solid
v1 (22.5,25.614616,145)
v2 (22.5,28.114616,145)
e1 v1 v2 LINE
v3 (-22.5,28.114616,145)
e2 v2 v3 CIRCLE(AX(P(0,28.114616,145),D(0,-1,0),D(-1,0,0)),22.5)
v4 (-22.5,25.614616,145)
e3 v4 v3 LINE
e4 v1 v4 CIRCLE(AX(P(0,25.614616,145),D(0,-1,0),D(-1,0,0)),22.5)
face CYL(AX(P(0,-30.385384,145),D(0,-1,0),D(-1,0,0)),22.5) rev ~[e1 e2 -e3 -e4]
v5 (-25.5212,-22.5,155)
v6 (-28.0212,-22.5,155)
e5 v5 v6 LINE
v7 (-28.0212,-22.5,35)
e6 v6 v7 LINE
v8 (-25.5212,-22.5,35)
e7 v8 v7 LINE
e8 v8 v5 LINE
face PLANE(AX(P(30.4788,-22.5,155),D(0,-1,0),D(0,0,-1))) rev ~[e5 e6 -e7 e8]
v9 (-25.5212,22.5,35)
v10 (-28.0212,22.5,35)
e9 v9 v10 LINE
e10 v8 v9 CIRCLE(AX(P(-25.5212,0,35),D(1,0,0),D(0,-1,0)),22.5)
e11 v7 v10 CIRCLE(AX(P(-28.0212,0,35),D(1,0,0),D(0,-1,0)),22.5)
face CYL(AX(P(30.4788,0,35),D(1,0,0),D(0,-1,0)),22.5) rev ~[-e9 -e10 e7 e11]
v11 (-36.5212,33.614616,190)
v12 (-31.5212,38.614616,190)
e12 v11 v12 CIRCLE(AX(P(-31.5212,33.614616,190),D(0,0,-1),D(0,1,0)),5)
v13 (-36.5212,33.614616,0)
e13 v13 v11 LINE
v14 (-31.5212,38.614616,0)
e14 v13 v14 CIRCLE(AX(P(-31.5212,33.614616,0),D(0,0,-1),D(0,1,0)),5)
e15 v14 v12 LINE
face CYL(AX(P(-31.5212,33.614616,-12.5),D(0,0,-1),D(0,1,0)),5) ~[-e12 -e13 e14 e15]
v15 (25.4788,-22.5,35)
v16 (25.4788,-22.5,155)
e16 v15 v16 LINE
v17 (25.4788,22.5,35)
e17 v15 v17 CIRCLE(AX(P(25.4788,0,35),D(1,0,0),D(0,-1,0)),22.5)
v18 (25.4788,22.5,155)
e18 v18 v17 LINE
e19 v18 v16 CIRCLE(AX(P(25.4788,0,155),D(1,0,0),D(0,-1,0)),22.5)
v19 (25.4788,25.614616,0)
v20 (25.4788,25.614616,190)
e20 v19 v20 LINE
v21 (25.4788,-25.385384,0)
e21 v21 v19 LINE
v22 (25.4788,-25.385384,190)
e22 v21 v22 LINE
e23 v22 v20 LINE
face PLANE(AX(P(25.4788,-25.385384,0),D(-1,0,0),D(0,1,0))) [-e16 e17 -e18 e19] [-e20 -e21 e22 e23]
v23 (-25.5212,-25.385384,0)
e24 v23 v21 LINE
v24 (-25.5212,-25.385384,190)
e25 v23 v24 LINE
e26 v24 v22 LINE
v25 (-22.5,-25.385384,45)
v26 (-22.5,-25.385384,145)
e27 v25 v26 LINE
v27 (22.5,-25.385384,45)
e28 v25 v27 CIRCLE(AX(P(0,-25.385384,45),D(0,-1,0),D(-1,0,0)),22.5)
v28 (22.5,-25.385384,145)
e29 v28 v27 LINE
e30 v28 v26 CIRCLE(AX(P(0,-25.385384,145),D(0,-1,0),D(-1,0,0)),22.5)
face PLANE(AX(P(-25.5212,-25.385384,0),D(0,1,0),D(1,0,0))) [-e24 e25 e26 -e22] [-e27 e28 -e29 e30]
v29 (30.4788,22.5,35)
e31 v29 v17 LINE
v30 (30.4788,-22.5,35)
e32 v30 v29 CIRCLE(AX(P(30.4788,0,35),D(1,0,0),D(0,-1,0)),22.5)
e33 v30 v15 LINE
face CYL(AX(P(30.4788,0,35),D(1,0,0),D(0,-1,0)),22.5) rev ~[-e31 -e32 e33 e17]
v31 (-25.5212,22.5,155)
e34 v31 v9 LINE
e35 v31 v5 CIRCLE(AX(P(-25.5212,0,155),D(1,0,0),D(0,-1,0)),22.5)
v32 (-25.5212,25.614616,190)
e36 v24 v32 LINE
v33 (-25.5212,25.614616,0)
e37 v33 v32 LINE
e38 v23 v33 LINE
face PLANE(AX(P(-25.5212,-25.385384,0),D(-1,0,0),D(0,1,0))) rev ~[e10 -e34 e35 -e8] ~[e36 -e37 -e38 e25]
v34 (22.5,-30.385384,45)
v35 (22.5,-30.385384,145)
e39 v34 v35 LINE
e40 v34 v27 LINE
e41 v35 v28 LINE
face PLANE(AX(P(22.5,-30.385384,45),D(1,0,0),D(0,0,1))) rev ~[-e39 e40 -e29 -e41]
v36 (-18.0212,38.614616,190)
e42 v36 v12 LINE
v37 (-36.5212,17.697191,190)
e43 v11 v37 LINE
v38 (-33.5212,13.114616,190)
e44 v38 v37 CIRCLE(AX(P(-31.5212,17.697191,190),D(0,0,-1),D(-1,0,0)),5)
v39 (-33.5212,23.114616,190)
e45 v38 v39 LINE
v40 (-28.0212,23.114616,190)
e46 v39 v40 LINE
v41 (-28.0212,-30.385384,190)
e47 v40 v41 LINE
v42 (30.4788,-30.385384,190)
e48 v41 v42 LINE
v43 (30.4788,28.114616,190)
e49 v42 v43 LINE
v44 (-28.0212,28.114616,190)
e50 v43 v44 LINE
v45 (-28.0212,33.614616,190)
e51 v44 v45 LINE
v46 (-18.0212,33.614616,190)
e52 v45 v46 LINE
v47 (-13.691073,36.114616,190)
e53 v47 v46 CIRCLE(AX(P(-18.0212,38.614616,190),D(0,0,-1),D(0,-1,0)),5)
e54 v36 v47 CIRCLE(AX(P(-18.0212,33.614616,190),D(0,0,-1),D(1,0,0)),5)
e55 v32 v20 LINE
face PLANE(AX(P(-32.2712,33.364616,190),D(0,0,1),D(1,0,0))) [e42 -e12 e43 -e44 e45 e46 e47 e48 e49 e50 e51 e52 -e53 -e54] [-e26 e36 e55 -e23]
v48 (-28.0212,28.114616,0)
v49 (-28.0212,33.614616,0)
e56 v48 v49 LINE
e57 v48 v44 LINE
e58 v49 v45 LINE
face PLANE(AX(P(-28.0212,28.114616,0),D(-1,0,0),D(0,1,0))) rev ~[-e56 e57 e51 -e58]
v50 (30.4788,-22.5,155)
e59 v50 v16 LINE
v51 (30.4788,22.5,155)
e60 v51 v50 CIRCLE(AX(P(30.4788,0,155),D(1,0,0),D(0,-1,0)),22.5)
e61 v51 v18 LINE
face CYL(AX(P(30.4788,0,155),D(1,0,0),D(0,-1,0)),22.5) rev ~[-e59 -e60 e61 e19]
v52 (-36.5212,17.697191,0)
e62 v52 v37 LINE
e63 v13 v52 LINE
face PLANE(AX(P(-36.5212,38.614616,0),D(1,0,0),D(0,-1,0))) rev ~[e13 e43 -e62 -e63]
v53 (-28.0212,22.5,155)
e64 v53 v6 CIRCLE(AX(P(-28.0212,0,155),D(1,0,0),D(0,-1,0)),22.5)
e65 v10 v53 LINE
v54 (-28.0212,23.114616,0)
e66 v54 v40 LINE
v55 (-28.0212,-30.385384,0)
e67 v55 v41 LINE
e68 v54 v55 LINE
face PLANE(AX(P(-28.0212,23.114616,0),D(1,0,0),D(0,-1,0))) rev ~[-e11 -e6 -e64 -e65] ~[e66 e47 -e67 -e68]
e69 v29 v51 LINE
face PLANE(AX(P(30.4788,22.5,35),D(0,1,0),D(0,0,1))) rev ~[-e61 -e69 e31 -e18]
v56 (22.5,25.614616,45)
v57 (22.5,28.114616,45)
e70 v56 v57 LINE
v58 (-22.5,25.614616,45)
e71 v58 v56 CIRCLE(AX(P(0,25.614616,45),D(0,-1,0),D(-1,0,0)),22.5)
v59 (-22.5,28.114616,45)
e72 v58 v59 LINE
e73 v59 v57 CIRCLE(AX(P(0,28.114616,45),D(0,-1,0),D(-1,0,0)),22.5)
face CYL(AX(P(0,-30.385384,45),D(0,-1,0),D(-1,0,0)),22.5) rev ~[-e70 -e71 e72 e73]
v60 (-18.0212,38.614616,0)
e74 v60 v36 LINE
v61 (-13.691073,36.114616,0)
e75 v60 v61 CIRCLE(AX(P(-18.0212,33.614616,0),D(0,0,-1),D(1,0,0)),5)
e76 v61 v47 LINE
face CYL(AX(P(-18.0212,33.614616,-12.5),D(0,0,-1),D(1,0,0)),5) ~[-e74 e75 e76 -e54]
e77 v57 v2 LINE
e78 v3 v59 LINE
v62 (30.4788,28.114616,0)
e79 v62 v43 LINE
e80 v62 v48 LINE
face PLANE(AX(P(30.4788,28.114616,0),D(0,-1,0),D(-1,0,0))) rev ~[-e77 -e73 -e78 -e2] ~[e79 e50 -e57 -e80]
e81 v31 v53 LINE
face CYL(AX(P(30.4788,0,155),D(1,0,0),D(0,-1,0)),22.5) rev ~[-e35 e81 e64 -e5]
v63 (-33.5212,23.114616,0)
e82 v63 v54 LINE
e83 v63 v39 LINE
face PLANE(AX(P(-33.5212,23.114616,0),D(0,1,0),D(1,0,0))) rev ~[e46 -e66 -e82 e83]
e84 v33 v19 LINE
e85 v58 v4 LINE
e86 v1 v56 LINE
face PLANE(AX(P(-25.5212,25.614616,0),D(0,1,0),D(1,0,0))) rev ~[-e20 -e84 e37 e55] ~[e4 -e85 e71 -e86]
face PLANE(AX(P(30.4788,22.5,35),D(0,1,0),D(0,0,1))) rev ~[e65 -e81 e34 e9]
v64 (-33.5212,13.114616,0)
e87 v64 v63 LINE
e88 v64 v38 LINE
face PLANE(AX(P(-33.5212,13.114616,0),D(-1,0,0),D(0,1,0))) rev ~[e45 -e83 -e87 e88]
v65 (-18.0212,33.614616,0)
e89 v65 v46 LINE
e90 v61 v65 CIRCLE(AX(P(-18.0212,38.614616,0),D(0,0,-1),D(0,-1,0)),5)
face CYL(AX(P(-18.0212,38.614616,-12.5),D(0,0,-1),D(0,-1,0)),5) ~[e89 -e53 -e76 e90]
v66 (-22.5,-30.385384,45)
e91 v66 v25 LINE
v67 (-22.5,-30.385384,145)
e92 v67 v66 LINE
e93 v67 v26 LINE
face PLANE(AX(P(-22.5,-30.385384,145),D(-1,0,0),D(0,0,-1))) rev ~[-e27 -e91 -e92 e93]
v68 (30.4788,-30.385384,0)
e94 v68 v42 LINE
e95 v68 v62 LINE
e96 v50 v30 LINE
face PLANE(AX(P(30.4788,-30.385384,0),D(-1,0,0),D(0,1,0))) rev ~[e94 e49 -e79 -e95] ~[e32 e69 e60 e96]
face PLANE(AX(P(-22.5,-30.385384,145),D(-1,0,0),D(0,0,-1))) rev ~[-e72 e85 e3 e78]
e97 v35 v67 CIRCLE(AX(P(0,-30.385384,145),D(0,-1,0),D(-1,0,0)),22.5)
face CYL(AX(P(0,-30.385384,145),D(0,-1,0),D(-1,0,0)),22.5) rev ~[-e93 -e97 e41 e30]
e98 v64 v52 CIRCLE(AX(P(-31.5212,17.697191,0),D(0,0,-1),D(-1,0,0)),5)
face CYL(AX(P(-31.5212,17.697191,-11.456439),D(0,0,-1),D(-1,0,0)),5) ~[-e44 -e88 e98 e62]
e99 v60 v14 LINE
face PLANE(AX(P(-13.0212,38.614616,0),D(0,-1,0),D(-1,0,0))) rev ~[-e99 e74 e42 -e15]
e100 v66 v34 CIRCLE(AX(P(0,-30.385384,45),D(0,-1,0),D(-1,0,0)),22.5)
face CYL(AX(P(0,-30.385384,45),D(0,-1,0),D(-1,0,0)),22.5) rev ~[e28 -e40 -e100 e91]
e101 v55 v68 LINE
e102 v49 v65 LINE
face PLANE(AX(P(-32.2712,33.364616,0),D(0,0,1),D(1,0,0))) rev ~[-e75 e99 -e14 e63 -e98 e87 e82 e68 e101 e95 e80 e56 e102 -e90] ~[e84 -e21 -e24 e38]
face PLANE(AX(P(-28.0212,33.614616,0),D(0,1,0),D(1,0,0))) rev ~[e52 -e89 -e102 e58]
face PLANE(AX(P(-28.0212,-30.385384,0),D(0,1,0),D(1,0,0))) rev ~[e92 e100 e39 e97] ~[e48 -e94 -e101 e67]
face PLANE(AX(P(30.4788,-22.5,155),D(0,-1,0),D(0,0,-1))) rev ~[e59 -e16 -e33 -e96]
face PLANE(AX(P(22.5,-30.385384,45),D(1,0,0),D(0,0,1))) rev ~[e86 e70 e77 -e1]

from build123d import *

# Parameters (mm, degrees)
F0_W        = 5.5
F0_H        = 5
F0_W_2      = 51
F0_H_2      = 51
F1_DEPTH    = 190
F2_T1_DEPTH = 215
F2_T3_DEPTH = 212.9128784748
F4_DEPTH    = 60
F6_DEPTH    = 60


# Not quite as in the source:
# - a fillet or chamfer that OpenCascade refuses, or shapes differently, is made with other operations: its cross-section is extruded or revolved along the edge and cut away or added


with BuildPart() as f1:
    # F0 (on Top) → F1 (new body)
    with BuildSketch(Plane.XY):
        Polygon((-33.5212003861, 28.1146157656), (-28.0212003861, 28.1146157656), (-28.0212003861, 33.6146157656), (-28.0212003861, 38.6146157656), (-36.5212003861, 38.6146157656), (-36.5212003861, 28.1146157656), align=None)
        Polygon((-28.0212003861, 38.6146157656), (-28.0212003861, 33.6146157656), (-23.0212003861, 33.6146157656), (-13.0212003861, 33.6146157656), (-13.0212003861, 38.6146157656), align=None)
        with Locations((-30.7712003861, 25.6146157656)):
            Rectangle(F0_W, F0_H)
        Polygon((-33.5212003861, 23.1146157656), (-33.5212003861, 28.1146157656), (-36.5212003861, 28.1146157656), (-36.5212003861, 13.1146157656), (-33.5212003861, 13.1146157656), align=None)
        Polygon((-23.0212003861, 28.1146157656), (-28.0212003861, 28.1146157656), (-28.0212003861, 23.1146157656), (-28.0212003861, -30.3853842344), (30.4787996139, -30.3853842344), (30.4787996139, 28.1146157656), align=None)
        with Locations((-0.0212003861, 0.1146157656)):
            Rectangle(F0_W_2, F0_H_2, mode=Mode.SUBTRACT)
    extrude(amount=F1_DEPTH)

    # F2: fillet of radius 5 on 4 edges, made by hand

    # F2_s2 → F2_t1 (cut)
    with BuildSketch(Plane.XY.offset(-12.5)):
        with BuildLine():
            ThreePointArc((-31.5212003861, 38.6146157656), (-35.056734292, 37.1501496716), (-36.5212003861, 33.6146157656))
            Line((-36.5212003861, 33.6146157656), (-36.5212003861, 38.6146157656))
            Line((-36.5212003861, 38.6146157656), (-31.5212003861, 38.6146157656))
        make_face()
        with BuildLine():
            ThreePointArc((-13.0212003861, 33.6146157656), (-14.4856664802, 37.1501496716), (-18.0212003861, 38.6146157656))
            Line((-18.0212003861, 38.6146157656), (-13.0212003861, 38.6146157656))
            Line((-13.0212003861, 38.6146157656), (-13.0212003861, 33.6146157656))
        make_face()
        with BuildLine():
            ThreePointArc((-18.0212003861, 33.6146157656), (-14.4856664802, 35.0790818597), (-13.0212003861, 38.6146157656))
            Line((-13.0212003861, 38.6146157656), (-13.0212003861, 33.6146157656))
            Line((-13.0212003861, 33.6146157656), (-18.0212003861, 33.6146157656))
        make_face()
    extrude(amount=F2_T1_DEPTH, mode=Mode.SUBTRACT)

    # F2_s4 → F2_t3 (cut)
    with BuildSketch(Plane.XY.offset(-11.4564392374)):
        with BuildLine():
            ThreePointArc((-36.5212003861, 17.6971914606), (-35.7045005188, 14.9585786731), (-33.5212003861, 13.1146157656))
            Line((-33.5212003861, 13.1146157656), (-36.5212003861, 13.1146157656))
            Line((-36.5212003861, 13.1146157656), (-36.5212003861, 17.6971914606))
        make_face()
    extrude(amount=F2_T3_DEPTH, mode=Mode.SUBTRACT)

    # F3 (on face) → F4 (cut)
    with BuildSketch(Plane.YZ.offset(30.4787996139)):
        with BuildLine():
            Line((-22.5, 155), (22.5, 155))
            ThreePointArc((22.5, 155), (0, 177.5), (-22.5, 155))
        make_face()
        with BuildLine():
            ThreePointArc((-22.5, 155), (0, 132.5), (22.5, 155))
            Line((22.5, 155), (-22.5, 155))
        make_face()
        with BuildLine():
            ThreePointArc((-22.5, 35), (0, 57.5), (22.5, 35))
            Line((22.5, 35), (22.5, 155))
            ThreePointArc((22.5, 155), (0, 132.5), (-22.5, 155))
            Line((-22.5, 155), (-22.5, 35))
        make_face()
        with BuildLine():
            Line((-22.5, 35), (22.5, 35))
            ThreePointArc((22.5, 35), (0, 57.5), (-22.5, 35))
        make_face()
        with BuildLine():
            ThreePointArc((-22.5, 35), (0, 12.5), (22.5, 35))
            Line((22.5, 35), (-22.5, 35))
        make_face()
    extrude(amount=-F4_DEPTH, mode=Mode.SUBTRACT)

    # F5 (on face) → F6 (cut)
    with BuildSketch(Plane.XZ.offset(30.3853842344)):
        with BuildLine():
            Line((-22.5, 145), (22.5, 145))
            ThreePointArc((22.5, 145), (0, 167.5), (-22.5, 145))
        make_face()
        with BuildLine():
            ThreePointArc((-22.5, 145), (0, 122.5), (22.5, 145))
            Line((22.5, 145), (-22.5, 145))
        make_face()
        with BuildLine():
            Line((22.5, 45), (22.5, 145))
            ThreePointArc((22.5, 145), (0, 122.5), (-22.5, 145))
            Line((-22.5, 145), (-22.5, 45))
            ThreePointArc((-22.5, 45), (0, 67.5), (22.5, 45))
        make_face()
        with BuildLine():
            Line((-22.5, 45), (22.5, 45))
            ThreePointArc((22.5, 45), (0, 67.5), (-22.5, 45))
        make_face()
        with BuildLine():
            ThreePointArc((-22.5, 45), (0, 22.5), (22.5, 45))
            Line((22.5, 45), (-22.5, 45))
        make_face()
    extrude(amount=-F6_DEPTH, mode=Mode.SUBTRACT)


solid = f1.part
